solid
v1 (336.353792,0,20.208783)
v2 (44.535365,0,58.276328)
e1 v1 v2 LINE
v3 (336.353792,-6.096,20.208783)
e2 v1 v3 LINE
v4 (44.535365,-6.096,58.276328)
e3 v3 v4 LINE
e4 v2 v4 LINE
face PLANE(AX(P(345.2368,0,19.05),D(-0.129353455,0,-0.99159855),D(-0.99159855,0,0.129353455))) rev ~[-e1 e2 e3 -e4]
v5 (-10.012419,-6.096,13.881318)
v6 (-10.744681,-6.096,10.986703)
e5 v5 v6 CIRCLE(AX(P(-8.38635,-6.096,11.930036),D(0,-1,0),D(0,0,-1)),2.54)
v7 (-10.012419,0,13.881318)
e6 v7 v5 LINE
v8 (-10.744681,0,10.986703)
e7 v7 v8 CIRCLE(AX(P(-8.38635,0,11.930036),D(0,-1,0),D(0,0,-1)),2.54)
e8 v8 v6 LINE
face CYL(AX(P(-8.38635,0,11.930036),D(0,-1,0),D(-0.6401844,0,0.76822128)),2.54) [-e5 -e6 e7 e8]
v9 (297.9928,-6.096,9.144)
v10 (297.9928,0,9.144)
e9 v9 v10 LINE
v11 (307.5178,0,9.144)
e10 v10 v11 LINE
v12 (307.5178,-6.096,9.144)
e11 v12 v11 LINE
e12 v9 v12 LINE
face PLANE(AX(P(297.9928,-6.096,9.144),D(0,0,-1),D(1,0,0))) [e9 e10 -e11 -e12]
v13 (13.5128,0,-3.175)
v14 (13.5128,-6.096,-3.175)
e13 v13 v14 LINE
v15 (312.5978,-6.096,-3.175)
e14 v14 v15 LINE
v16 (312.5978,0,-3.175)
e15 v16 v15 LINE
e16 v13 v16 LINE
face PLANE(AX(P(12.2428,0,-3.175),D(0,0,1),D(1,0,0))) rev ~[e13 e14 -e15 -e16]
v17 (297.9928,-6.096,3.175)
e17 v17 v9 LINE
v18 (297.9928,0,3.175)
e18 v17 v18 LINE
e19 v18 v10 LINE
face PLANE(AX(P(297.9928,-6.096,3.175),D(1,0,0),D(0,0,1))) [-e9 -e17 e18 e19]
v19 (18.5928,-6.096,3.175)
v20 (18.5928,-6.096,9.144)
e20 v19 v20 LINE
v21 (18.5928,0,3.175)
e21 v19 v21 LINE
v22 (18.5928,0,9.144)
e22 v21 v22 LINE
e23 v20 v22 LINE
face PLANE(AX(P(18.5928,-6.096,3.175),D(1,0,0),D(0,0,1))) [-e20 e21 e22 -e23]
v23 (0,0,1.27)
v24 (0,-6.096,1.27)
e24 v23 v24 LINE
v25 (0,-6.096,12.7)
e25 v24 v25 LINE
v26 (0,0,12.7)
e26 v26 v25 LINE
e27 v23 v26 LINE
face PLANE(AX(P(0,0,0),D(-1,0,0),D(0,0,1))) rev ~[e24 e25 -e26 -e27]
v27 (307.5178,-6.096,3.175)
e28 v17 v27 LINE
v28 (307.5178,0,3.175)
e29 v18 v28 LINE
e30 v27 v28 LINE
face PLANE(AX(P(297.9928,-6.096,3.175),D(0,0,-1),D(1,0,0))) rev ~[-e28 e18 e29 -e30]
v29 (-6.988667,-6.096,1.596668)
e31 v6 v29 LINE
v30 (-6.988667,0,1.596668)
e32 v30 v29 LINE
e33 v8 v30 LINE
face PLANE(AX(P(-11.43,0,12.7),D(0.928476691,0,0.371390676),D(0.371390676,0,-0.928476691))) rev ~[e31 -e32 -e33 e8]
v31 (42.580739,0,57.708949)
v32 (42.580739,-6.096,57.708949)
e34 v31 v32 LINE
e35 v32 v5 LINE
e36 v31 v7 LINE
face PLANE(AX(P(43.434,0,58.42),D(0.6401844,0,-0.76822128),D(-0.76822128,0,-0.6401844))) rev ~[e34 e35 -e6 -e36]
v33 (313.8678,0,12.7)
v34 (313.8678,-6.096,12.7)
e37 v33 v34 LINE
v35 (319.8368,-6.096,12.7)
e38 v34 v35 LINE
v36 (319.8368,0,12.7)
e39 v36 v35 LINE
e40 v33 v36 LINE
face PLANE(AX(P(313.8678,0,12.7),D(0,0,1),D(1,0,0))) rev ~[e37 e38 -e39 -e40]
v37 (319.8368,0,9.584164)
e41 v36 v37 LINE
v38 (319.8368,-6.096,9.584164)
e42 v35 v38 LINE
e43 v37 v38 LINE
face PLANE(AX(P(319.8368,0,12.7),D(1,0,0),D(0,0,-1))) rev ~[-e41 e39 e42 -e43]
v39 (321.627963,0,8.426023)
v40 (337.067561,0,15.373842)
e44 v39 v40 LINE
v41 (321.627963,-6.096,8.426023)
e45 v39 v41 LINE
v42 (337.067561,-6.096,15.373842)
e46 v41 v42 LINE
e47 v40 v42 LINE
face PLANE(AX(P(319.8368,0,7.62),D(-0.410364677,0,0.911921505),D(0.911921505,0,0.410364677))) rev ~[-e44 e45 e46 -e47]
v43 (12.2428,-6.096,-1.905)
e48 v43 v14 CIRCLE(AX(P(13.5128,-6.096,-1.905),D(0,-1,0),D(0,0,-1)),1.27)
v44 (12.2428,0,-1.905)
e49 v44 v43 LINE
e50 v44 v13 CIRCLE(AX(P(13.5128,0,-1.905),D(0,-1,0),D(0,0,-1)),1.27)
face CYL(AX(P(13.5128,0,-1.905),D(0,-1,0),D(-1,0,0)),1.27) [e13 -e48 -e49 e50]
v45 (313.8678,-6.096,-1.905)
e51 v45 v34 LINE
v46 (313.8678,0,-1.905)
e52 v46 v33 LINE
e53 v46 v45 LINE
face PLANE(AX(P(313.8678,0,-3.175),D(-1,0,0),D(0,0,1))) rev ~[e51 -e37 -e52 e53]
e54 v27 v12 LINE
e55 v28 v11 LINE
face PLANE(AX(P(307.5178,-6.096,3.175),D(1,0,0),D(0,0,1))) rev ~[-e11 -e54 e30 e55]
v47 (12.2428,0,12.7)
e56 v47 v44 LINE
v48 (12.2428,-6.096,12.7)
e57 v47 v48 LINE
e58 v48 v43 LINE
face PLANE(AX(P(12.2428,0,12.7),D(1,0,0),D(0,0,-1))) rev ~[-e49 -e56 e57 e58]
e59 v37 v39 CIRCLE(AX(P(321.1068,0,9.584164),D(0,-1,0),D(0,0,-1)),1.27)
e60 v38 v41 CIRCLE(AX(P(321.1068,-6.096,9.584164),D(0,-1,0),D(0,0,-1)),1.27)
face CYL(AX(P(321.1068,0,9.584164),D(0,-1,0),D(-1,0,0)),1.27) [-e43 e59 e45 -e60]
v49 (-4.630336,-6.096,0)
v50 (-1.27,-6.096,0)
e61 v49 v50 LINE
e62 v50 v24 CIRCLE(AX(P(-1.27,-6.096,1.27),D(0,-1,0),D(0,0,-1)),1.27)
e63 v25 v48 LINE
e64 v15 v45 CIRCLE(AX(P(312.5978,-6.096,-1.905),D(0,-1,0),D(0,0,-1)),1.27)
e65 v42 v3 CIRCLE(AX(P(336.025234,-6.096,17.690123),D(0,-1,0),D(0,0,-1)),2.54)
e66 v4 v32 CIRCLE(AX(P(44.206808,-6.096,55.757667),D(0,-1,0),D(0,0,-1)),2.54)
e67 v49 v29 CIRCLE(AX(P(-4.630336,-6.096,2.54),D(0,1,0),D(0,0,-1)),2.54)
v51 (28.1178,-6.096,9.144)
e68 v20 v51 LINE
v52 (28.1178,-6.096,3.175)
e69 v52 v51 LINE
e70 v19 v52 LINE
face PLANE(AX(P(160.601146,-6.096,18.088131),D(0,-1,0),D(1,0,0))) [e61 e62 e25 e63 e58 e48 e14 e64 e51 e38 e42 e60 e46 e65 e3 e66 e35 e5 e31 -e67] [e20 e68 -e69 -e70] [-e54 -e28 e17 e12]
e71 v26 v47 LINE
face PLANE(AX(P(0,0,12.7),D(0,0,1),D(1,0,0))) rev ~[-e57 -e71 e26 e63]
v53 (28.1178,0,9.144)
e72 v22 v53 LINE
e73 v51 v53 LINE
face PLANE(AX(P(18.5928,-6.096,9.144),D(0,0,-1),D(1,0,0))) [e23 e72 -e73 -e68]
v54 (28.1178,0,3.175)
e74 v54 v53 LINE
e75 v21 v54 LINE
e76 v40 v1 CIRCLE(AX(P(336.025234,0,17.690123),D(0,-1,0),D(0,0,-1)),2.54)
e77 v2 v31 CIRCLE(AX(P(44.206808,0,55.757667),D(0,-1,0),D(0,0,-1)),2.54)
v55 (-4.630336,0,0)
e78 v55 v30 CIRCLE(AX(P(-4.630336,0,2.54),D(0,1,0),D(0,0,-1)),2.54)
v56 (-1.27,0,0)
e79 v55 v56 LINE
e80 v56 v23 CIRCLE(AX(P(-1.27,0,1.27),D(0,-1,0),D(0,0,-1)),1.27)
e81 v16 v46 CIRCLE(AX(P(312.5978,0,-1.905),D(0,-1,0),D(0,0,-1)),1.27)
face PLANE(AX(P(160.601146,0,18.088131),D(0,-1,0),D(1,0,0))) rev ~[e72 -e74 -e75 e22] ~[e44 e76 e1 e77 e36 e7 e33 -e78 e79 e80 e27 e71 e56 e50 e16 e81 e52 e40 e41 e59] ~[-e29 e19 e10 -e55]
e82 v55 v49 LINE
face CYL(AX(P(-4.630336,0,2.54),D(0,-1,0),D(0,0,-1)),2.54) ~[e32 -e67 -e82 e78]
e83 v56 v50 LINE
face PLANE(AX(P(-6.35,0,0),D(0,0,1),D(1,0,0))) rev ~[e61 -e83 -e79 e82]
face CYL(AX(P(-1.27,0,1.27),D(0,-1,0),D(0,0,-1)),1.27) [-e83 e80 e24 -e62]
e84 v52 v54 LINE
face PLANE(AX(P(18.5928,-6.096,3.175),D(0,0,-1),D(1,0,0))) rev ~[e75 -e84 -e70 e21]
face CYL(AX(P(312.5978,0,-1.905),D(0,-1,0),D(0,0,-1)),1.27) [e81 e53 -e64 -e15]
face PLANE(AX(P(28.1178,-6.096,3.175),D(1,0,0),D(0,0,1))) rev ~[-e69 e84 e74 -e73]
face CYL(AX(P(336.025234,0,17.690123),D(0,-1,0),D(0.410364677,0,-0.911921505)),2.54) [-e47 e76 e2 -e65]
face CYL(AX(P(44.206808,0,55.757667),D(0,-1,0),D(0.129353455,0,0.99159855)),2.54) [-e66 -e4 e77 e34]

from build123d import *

# Parameters (mm, degrees)
F1_DEPTH = 6.096
F4_R     = 2.54
F5_R     = 1.27
F6_W     = 9.525
F6_H     = 5.969
F7_DEPTH = 6.097


# Not quite as in the source:
# - a feature of the source that left no trace in its solid (it failed there, or was rolled back) is left out


with BuildPart() as f1:
    # F0 (on Front) → F1 (new body)
    with BuildSketch(Plane.XZ):
        Polygon((-6.35, 0), (0, 0), (0, 12.7), (12.2428, 12.7), (12.2428, -3.175), (313.8678, -3.175), (313.8678, 12.7), (319.8368, 12.7), (319.8368, 7.62), (345.2368, 19.05), (43.434, 58.42), (0, 22.225), (-11.43, 12.7), align=None)
    extrude(amount=F1_DEPTH)

    # F4
    f4_edges = [f1.edges().sort_by_distance(p)[0] for p in [
        (43.434, -3.048, 58.42),
        (-11.43, -3.048, 12.7),
        (-6.35, -3.048, 0),
        (345.2368, -3.048, 19.05),
    ]]
    fillet(f4_edges, radius=F4_R)

    # F5
    f5_edges = [f1.edges().sort_by_distance(p)[0] for p in [
        (0, -3.048, 0),
        (12.2428, -3.048, -3.175),
        (319.8368, -3.048, 7.62),
        (313.8678, -3.048, -3.175),
    ]]
    fillet(f5_edges, radius=F5_R)

    # F6 (on face) → F7 (cut, through all)
    with BuildSketch(Plane.XZ.offset(6.096)):
        with Locations((23.3553, 6.1595)):
            Rectangle(F6_W, F6_H)
        with Locations((302.7553, 6.1595)):
            Rectangle(F6_W, F6_H)
    extrude(amount=-F7_DEPTH, mode=Mode.SUBTRACT)


solid = f1.part
